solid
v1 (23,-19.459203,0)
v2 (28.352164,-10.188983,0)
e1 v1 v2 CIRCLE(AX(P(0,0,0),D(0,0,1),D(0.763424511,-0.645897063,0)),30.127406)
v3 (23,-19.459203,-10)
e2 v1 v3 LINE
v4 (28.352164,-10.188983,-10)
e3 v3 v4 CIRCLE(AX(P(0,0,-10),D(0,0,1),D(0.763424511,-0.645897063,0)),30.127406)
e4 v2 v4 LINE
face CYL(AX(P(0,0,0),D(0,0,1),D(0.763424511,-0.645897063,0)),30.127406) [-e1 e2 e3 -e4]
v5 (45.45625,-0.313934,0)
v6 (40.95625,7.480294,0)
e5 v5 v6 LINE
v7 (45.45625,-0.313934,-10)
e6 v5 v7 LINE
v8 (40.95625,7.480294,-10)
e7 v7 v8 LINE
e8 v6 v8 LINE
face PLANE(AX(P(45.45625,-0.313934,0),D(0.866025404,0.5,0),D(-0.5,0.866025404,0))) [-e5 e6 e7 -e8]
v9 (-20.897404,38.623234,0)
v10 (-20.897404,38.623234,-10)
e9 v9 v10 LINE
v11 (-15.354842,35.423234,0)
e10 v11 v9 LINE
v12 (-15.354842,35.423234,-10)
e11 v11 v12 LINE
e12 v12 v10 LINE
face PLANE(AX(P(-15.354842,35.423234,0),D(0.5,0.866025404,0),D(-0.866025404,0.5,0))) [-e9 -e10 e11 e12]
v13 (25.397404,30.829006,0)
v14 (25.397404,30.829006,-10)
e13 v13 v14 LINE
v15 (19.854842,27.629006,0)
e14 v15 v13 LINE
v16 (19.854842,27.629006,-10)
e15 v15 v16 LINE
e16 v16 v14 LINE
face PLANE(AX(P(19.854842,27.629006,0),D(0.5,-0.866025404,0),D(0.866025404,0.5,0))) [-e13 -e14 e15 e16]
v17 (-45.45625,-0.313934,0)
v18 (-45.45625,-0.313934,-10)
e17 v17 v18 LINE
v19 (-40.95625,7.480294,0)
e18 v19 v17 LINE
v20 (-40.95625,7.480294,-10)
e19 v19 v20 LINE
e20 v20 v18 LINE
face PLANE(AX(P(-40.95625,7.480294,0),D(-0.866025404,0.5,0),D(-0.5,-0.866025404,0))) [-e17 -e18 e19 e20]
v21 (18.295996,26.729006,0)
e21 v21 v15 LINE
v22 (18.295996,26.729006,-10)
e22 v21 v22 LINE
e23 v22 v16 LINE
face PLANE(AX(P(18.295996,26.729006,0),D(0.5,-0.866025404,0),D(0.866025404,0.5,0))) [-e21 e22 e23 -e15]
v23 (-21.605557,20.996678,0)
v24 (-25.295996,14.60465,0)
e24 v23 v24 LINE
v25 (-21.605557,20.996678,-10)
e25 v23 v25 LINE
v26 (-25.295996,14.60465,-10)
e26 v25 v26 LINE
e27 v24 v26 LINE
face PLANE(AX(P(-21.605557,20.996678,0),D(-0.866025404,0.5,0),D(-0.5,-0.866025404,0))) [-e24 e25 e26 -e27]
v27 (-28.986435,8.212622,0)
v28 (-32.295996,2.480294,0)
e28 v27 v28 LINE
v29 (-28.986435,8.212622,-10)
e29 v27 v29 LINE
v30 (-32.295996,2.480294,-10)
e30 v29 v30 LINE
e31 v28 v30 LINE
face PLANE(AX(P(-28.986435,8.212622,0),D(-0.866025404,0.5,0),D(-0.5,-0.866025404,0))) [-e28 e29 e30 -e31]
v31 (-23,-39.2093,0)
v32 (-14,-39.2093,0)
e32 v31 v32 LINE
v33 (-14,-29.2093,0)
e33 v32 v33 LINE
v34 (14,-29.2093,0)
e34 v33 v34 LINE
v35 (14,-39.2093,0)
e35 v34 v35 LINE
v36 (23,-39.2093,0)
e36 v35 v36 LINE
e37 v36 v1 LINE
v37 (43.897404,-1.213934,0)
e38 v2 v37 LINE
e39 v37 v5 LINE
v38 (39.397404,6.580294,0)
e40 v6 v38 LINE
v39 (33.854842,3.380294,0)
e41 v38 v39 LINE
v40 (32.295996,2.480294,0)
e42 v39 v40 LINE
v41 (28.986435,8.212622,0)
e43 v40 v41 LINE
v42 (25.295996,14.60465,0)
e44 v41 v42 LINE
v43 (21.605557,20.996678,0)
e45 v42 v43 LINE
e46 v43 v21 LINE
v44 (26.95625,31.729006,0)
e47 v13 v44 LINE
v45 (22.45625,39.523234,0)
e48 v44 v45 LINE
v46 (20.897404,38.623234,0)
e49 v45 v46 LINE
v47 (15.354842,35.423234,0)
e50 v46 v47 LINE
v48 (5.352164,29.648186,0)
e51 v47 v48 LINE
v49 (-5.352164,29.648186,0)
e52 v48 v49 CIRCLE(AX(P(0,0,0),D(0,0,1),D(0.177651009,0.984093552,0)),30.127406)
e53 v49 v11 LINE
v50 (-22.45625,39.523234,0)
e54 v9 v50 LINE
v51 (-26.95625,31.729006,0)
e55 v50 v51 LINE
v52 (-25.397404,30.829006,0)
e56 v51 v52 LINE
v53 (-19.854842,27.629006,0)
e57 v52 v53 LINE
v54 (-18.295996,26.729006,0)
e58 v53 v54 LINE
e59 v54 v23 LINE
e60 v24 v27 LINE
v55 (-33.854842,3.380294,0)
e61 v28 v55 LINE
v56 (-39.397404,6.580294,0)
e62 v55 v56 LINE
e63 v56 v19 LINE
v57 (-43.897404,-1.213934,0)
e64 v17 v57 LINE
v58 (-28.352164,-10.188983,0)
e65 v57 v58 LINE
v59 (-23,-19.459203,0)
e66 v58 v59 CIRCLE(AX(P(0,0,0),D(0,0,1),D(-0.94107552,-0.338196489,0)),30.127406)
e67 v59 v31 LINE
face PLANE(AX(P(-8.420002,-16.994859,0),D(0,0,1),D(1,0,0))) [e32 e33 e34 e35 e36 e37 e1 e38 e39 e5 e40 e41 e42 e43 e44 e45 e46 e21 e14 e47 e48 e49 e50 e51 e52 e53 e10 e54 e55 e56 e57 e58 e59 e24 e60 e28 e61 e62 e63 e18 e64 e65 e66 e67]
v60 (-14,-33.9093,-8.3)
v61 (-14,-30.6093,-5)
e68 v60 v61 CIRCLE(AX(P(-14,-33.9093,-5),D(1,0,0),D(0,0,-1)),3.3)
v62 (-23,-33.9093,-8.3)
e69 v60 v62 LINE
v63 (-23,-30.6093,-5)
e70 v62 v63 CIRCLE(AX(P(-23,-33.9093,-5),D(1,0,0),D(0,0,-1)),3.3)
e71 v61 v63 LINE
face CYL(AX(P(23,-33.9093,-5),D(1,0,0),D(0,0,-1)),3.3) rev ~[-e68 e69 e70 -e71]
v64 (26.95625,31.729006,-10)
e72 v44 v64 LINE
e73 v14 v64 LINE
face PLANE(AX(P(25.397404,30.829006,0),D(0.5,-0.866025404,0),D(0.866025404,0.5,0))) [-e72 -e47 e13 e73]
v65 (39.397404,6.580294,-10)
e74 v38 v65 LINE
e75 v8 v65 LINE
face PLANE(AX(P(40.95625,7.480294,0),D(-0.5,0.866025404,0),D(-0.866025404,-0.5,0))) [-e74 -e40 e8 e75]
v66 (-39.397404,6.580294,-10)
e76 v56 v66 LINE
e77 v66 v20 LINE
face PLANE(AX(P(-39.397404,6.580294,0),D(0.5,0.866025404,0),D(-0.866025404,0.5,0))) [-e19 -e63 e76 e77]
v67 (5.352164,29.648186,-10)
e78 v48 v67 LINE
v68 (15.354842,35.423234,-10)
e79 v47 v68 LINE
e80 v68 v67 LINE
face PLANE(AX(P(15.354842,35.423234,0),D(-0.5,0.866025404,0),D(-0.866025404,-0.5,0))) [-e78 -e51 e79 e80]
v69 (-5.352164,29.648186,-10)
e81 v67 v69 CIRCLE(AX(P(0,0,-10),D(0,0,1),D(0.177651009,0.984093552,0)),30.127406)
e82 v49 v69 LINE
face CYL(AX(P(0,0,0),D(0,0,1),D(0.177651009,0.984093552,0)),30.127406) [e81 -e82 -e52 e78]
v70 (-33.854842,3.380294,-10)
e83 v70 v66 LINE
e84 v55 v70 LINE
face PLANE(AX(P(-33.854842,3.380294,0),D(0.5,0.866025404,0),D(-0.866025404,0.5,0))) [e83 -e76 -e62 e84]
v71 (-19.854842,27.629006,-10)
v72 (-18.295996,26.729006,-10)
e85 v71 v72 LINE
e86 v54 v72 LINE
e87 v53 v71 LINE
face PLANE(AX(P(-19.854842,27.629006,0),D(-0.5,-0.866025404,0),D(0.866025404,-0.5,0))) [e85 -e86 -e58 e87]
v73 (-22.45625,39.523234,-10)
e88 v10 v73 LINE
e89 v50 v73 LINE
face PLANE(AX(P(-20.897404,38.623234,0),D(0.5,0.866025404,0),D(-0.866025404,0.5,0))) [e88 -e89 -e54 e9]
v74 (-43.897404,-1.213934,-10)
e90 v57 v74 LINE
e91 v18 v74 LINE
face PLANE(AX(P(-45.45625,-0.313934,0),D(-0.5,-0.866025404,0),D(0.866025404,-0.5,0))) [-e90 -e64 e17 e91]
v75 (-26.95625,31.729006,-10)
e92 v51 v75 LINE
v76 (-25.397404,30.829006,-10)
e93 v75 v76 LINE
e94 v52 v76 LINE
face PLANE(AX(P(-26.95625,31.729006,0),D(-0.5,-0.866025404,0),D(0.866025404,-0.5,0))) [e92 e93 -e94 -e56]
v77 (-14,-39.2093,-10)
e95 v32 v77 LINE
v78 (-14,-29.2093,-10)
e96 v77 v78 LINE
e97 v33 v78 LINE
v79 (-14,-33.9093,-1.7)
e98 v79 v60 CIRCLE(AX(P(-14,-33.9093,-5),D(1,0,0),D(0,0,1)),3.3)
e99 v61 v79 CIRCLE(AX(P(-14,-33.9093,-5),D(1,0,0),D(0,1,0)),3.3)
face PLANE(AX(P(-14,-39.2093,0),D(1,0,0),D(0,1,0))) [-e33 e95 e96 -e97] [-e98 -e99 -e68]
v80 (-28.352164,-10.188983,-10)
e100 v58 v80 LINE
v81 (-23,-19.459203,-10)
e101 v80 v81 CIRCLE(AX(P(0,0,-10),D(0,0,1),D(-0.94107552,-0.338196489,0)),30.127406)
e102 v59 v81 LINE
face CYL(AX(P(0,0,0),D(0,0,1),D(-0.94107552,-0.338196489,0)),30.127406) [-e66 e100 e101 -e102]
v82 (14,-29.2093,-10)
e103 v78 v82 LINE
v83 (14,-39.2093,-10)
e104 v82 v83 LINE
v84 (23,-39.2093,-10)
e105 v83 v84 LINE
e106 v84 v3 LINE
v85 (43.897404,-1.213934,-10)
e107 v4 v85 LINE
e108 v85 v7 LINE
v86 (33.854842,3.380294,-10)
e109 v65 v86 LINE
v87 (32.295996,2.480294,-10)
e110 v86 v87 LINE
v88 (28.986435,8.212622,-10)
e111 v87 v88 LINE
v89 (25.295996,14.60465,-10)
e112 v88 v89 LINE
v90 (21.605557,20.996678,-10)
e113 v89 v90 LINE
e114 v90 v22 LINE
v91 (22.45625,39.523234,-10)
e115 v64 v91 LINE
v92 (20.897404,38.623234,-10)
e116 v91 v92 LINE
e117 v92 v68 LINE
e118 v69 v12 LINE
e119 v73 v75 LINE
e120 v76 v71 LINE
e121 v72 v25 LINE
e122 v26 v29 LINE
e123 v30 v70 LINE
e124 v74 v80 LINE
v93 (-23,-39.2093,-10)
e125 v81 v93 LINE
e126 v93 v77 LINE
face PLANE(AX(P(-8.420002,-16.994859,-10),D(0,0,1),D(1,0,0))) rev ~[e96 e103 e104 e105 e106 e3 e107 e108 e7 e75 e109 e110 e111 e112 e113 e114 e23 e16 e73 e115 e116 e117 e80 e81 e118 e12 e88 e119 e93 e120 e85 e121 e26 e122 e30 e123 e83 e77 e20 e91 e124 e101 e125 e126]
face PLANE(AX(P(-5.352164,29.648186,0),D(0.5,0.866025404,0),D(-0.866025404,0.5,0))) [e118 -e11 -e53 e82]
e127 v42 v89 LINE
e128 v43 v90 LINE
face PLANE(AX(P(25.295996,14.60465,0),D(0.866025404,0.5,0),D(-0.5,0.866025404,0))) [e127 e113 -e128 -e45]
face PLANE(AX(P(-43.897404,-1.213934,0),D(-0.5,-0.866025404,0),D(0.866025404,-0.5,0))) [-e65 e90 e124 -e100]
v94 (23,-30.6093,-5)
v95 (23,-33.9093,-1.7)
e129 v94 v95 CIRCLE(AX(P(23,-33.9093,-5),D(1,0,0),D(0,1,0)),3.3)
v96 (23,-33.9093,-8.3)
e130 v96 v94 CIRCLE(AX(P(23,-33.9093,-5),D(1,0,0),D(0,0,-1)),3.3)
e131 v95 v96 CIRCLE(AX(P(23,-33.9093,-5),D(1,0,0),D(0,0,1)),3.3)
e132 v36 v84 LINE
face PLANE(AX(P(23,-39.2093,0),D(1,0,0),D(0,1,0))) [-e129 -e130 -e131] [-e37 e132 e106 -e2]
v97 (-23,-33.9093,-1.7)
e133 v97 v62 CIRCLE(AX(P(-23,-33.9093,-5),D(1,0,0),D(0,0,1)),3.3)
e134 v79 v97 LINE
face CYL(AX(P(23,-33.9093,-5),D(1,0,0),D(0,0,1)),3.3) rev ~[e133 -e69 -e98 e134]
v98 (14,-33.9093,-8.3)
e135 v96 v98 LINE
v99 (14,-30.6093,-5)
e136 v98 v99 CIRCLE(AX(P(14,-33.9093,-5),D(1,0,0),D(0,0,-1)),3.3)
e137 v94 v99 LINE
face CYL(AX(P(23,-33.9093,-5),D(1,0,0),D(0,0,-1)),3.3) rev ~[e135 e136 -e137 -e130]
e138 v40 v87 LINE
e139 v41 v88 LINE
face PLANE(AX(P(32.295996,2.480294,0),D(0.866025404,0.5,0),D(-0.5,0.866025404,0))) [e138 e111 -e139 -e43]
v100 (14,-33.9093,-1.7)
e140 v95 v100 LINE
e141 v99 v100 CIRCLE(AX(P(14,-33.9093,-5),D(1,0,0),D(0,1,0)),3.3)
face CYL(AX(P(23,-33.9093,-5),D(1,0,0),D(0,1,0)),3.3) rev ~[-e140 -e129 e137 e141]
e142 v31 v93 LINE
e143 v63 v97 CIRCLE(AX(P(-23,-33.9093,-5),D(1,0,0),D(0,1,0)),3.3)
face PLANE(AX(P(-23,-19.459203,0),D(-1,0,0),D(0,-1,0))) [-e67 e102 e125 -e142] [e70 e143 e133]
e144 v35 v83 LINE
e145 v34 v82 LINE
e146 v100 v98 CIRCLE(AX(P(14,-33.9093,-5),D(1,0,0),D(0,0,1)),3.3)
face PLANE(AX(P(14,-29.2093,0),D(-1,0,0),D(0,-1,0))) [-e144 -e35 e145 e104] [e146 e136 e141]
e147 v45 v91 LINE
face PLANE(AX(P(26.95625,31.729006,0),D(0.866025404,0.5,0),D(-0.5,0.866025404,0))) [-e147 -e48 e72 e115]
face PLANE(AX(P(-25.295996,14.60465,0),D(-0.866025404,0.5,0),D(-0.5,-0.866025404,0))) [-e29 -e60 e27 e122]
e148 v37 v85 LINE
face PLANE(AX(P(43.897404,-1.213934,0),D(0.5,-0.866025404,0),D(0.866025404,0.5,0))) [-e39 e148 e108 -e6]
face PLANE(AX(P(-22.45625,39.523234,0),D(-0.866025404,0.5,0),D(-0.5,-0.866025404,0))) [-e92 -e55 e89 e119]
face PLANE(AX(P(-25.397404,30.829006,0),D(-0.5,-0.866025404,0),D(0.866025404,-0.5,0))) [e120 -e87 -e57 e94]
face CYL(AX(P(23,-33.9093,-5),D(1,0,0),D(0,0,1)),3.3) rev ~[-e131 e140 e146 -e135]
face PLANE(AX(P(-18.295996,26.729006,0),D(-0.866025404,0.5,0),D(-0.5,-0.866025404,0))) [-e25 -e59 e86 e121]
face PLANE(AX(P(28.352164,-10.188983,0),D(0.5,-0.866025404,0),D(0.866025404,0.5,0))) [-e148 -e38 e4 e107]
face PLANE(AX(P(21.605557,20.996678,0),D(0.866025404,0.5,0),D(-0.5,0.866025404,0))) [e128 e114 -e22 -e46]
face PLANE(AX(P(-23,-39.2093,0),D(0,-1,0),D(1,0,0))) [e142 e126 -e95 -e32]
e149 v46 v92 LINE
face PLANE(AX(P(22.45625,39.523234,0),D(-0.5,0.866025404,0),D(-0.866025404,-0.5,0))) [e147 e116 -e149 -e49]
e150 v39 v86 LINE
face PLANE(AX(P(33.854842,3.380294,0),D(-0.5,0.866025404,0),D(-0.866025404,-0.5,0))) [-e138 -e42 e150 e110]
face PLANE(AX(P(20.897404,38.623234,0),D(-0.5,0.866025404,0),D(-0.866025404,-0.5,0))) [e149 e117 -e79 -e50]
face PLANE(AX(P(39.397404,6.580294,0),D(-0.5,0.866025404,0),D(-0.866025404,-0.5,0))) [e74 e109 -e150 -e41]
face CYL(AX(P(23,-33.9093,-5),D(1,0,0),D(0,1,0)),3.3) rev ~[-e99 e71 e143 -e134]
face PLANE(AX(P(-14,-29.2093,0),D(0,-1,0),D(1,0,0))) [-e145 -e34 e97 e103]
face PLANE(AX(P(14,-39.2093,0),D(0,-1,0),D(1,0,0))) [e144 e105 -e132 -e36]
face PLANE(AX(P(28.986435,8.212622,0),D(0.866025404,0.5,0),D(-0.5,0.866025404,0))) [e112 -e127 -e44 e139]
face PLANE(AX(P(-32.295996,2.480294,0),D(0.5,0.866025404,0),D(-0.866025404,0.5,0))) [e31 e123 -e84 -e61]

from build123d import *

# Parameters (mm, degrees)
F0_W     = 9
F0_H     = 6.4
F0_H_2   = 1.8
F1_DEPTH = 10
F3_DEPTH = 68.4572498646


with BuildPart() as f1:
    # F0 (on Top) → F1 (new body)
    with BuildSketch(Plane.XY):
        with BuildLine():
            Line((-23, -13.2790561914), (-23, -19.4471))
            Line((-23, -19.4471), (-23, -19.4592028655))
            ThreePointArc((-23, -19.4592028655), (-15.9535433508, -25.5567022661), (-7.3808786516, -29.2093))
            Line((-7.3808786516, -29.2093), (0, -29.2093))
            Line((0, -29.2093), (0, 0))
            Line((0, 0), (-11.5, -19.918584287))
            Line((-11.5, -19.918584287), (-23, -13.2790561914))
        make_face()
        with BuildLine():
            Line((-23, -19.4592028655), (-23, -19.4471))
            Line((-23, -19.4471), (-23, -13.2790561914))
            Line((-23, -13.2790561914), (-28.3416826299, -10.195034287))
            Line((-28.3416826299, -10.195034287), (-28.3521640189, -10.1889828543))
            ThreePointArc((-28.3521640189, -10.1889828543), (-26.0910987143, -15.0637028662), (-23, -19.4592028655))
        make_face()
        with BuildLine():
            ThreePointArc((-7.3808786516, -29.2093), (-15.9535433508, -25.5567022661), (-23, -19.4592028655))
            Line((-23, -19.4592028655), (-23, -31.0093))
            Line((-23, -31.0093), (-14, -31.0093))
            Line((-14, -31.0093), (-14, -29.2093))
            Line((-14, -29.2093), (-7.3808786516, -29.2093))
        make_face()
        with BuildLine():
            Line((-28.3416826299, -10.195034287), (-23, -13.2790561914))
            Line((-23, -13.2790561914), (-23, 0))
            Line((-23, 0), (0, 0))
            Line((0, 0), (-25.2959958268, 14.60465))
            Line((-25.2959958268, 14.60465), (-28.9864351526, 8.2126215854))
            ThreePointArc((-28.9864351526, 8.2126215854), (-30.1095250747, -1.0378226891), (-28.3521640189, -10.1889828543))
            Line((-28.3521640189, -10.1889828543), (-28.3416826299, -10.195034287))
        make_face()
        Polygon((-23, 0), (-23, -13.2790561914), (-11.5, -19.918584287), (0, 0), align=None)
        with Locations((-18.5, -34.2093)):
            Rectangle(F0_W, F0_H)
        with BuildLine():
            Line((-38.3548415536, -4.413934287), (-28.3521640189, -10.1889828543))
            ThreePointArc((-28.3521640189, -10.1889828543), (-30.1095250747, -1.0378226891), (-28.9864351526, 8.2126215854))
            Line((-28.9864351526, 8.2126215854), (-32.2959958268, 2.480294347))
            Line((-32.2959958268, 2.480294347), (-33.8548415536, 3.380294347))
            Line((-33.8548415536, 3.380294347), (-38.3548415536, -4.413934287))
        make_face()
        with Locations((-18.5, -38.3093)):
            Rectangle(F0_W, F0_H_2)
        Polygon((-43.8974041378, -1.213934287), (-38.3548415536, -4.413934287), (-33.8548415536, 3.380294347), (-39.3974041378, 6.580294347), align=None)
        with BuildLine():
            Line((0, 0), (0, -29.2093))
            Line((0, -29.2093), (7.3808786516, -29.2093))
            ThreePointArc((7.3808786516, -29.2093), (15.9535433508, -25.5567022661), (23, -19.4592028655))
            Line((23, -19.4592028655), (23, -19.4471))
            Line((23, -19.4471), (23, -13.2790561914))
            Line((23, -13.2790561914), (11.5, -19.918584287))
            Line((11.5, -19.918584287), (0, 0))
        make_face()
        with BuildLine():
            Line((25.2959958268, 14.60465), (0, 0))
            Line((0, 0), (23, 0))
            Line((23, 0), (23, -13.2790561914))
            Line((23, -13.2790561914), (28.3416826299, -10.195034287))
            Line((28.3416826299, -10.195034287), (28.3521640189, -10.1889828543))
            ThreePointArc((28.3521640189, -10.1889828543), (29.6802773315, -5.1712390862), (30.1274057323, 0))
            ThreePointArc((30.1274057323, 0), (29.8407998279, 4.1457498468), (28.9864351526, 8.2126215854))
            Line((28.9864351526, 8.2126215854), (25.2959958268, 14.60465))
        make_face()
        with BuildLine():
            Line((11.5, 19.918584287), (0, 0))
            Line((0, 0), (25.2959958268, 14.60465))
            Line((25.2959958268, 14.60465), (21.6055565009, 20.9966784146))
            ThreePointArc((21.6055565009, 20.9966784146), (14.155981724, 26.5945249552), (5.3521640189, 29.6481857198))
            Line((5.3521640189, 29.6481857198), (5.3416826299, 29.642134287))
            Line((5.3416826299, 29.642134287), (0, 26.5581123827))
            Line((0, 26.5581123827), (11.5, 19.918584287))
        make_face()
        with BuildLine():
            Line((-25.2959958268, 14.60465), (0, 0))
            Line((0, 0), (-11.5, 19.918584287))
            Line((-11.5, 19.918584287), (0, 26.5581123827))
            Line((0, 26.5581123827), (-5.3416826299, 29.642134287))
            Line((-5.3416826299, 29.642134287), (-5.3521640189, 29.6481857198))
            ThreePointArc((-5.3521640189, 29.6481857198), (-14.155981724, 26.5945249552), (-21.6055565009, 20.9966784146))
            Line((-21.6055565009, 20.9966784146), (-25.2959958268, 14.60465))
        make_face()
        Polygon((23, 0), (0, 0), (11.5, -19.918584287), (23, -13.2790561914), align=None)
        Polygon((-11.5, 19.918584287), (0, 0), (11.5, 19.918584287), (0, 26.5581123827), align=None)
        Polygon((-45.4562498646, -0.313934287), (-43.8974041378, -1.213934287), (-39.3974041378, 6.580294347), (-40.9562498646, 7.480294347), align=None)
        with BuildLine():
            ThreePointArc((23, -19.4592028655), (15.9535433508, -25.5567022661), (7.3808786516, -29.2093))
            Line((7.3808786516, -29.2093), (14, -29.2093))
            Line((14, -29.2093), (14, -31.0093))
            Line((14, -31.0093), (23, -31.0093))
            Line((23, -31.0093), (23, -19.4592028655))
        make_face()
        with Locations((18.5, -34.2093)):
            Rectangle(F0_W, F0_H)
        with BuildLine():
            Line((-18.2959958268, 26.729005653), (-21.6055565009, 20.9966784146))
            ThreePointArc((-21.6055565009, 20.9966784146), (-14.155981724, 26.5945249552), (-5.3521640189, 29.6481857198))
            Line((-5.3521640189, 29.6481857198), (-15.3548415536, 35.423234287))
            Line((-15.3548415536, 35.423234287), (-19.8548415536, 27.629005653))
            Line((-19.8548415536, 27.629005653), (-18.2959958268, 26.729005653))
        make_face()
        with BuildLine():
            Line((23, -19.4471), (23, -19.4592028655))
            ThreePointArc((23, -19.4592028655), (26.0910987143, -15.0637028662), (28.3521640189, -10.1889828543))
            Line((28.3521640189, -10.1889828543), (28.3416826299, -10.195034287))
            Line((28.3416826299, -10.195034287), (23, -13.2790561914))
            Line((23, -13.2790561914), (23, -19.4471))
        make_face()
        with BuildLine():
            ThreePointArc((5.3521640189, 29.6481857198), (14.155981724, 26.5945249552), (21.6055565009, 20.9966784146))
            Line((21.6055565009, 20.9966784146), (18.2959958268, 26.729005653))
            Line((18.2959958268, 26.729005653), (19.8548415536, 27.629005653))
            Line((19.8548415536, 27.629005653), (15.3548415536, 35.423234287))
            Line((15.3548415536, 35.423234287), (5.3521640189, 29.6481857198))
        make_face()
        with BuildLine():
            Line((32.2959958268, 2.480294347), (28.9864351526, 8.2126215854))
            ThreePointArc((28.9864351526, 8.2126215854), (29.8407998279, 4.1457498468), (30.1274057323, 0))
            ThreePointArc((30.1274057323, 0), (29.6802773315, -5.1712390862), (28.3521640189, -10.1889828543))
            Line((28.3521640189, -10.1889828543), (38.3548415536, -4.413934287))
            Line((38.3548415536, -4.413934287), (33.8548415536, 3.380294347))
            Line((33.8548415536, 3.380294347), (32.2959958268, 2.480294347))
        make_face()
        with BuildLine():
            Line((-5.3416826299, 29.642134287), (0, 26.5581123827))
            Line((0, 26.5581123827), (5.3416826299, 29.642134287))
            Line((5.3416826299, 29.642134287), (5.3521640189, 29.6481857198))
            ThreePointArc((5.3521640189, 29.6481857198), (0, 30.1274057323), (-5.3521640189, 29.6481857198))
            Line((-5.3521640189, 29.6481857198), (-5.3416826299, 29.642134287))
        make_face()
        with Locations((18.5, -38.3093)):
            Rectangle(F0_W, F0_H_2)
        Polygon((-25.3974041378, 30.829005653), (-19.8548415536, 27.629005653), (-15.3548415536, 35.423234287), (-20.8974041378, 38.623234287), align=None)
        Polygon((-26.9562498646, 31.729005653), (-25.3974041378, 30.829005653), (-20.8974041378, 38.623234287), (-22.4562498646, 39.523234287), align=None)
        Polygon((33.8548415536, 3.380294347), (38.3548415536, -4.413934287), (43.8974041378, -1.213934287), (39.3974041378, 6.580294347), align=None)
        Polygon((15.3548415536, 35.423234287), (19.8548415536, 27.629005653), (25.3974041378, 30.829005653), (20.8974041378, 38.623234287), align=None)
        Polygon((39.3974041378, 6.580294347), (43.8974041378, -1.213934287), (45.4562498646, -0.313934287), (40.9562498646, 7.480294347), align=None)
        Polygon((20.8974041378, 38.623234287), (25.3974041378, 30.829005653), (26.9562498646, 31.729005653), (22.4562498646, 39.523234287), align=None)
    extrude(amount=-F1_DEPTH)

    # F2 (on face) → F3 (cut, through all)
    with BuildSketch(Plane.YZ.offset(23)):
        with BuildLine():
            ThreePointArc((-33.9093, -1.7), (-37.2093, -5), (-33.9093, -8.3))
            Line((-33.9093, -8.3), (-33.9093, -1.7))
        make_face()
        with BuildLine():
            Line((-33.9093, -1.7), (-33.9093, -8.3))
            ThreePointArc((-33.9093, -8.3), (-31.5758476221, -7.3334523779), (-30.6093, -5))
            ThreePointArc((-30.6093, -5), (-31.5758476221, -2.6665476221), (-33.9093, -1.7))
        make_face()
    extrude(amount=-F3_DEPTH, mode=Mode.SUBTRACT)


solid = f1.part
